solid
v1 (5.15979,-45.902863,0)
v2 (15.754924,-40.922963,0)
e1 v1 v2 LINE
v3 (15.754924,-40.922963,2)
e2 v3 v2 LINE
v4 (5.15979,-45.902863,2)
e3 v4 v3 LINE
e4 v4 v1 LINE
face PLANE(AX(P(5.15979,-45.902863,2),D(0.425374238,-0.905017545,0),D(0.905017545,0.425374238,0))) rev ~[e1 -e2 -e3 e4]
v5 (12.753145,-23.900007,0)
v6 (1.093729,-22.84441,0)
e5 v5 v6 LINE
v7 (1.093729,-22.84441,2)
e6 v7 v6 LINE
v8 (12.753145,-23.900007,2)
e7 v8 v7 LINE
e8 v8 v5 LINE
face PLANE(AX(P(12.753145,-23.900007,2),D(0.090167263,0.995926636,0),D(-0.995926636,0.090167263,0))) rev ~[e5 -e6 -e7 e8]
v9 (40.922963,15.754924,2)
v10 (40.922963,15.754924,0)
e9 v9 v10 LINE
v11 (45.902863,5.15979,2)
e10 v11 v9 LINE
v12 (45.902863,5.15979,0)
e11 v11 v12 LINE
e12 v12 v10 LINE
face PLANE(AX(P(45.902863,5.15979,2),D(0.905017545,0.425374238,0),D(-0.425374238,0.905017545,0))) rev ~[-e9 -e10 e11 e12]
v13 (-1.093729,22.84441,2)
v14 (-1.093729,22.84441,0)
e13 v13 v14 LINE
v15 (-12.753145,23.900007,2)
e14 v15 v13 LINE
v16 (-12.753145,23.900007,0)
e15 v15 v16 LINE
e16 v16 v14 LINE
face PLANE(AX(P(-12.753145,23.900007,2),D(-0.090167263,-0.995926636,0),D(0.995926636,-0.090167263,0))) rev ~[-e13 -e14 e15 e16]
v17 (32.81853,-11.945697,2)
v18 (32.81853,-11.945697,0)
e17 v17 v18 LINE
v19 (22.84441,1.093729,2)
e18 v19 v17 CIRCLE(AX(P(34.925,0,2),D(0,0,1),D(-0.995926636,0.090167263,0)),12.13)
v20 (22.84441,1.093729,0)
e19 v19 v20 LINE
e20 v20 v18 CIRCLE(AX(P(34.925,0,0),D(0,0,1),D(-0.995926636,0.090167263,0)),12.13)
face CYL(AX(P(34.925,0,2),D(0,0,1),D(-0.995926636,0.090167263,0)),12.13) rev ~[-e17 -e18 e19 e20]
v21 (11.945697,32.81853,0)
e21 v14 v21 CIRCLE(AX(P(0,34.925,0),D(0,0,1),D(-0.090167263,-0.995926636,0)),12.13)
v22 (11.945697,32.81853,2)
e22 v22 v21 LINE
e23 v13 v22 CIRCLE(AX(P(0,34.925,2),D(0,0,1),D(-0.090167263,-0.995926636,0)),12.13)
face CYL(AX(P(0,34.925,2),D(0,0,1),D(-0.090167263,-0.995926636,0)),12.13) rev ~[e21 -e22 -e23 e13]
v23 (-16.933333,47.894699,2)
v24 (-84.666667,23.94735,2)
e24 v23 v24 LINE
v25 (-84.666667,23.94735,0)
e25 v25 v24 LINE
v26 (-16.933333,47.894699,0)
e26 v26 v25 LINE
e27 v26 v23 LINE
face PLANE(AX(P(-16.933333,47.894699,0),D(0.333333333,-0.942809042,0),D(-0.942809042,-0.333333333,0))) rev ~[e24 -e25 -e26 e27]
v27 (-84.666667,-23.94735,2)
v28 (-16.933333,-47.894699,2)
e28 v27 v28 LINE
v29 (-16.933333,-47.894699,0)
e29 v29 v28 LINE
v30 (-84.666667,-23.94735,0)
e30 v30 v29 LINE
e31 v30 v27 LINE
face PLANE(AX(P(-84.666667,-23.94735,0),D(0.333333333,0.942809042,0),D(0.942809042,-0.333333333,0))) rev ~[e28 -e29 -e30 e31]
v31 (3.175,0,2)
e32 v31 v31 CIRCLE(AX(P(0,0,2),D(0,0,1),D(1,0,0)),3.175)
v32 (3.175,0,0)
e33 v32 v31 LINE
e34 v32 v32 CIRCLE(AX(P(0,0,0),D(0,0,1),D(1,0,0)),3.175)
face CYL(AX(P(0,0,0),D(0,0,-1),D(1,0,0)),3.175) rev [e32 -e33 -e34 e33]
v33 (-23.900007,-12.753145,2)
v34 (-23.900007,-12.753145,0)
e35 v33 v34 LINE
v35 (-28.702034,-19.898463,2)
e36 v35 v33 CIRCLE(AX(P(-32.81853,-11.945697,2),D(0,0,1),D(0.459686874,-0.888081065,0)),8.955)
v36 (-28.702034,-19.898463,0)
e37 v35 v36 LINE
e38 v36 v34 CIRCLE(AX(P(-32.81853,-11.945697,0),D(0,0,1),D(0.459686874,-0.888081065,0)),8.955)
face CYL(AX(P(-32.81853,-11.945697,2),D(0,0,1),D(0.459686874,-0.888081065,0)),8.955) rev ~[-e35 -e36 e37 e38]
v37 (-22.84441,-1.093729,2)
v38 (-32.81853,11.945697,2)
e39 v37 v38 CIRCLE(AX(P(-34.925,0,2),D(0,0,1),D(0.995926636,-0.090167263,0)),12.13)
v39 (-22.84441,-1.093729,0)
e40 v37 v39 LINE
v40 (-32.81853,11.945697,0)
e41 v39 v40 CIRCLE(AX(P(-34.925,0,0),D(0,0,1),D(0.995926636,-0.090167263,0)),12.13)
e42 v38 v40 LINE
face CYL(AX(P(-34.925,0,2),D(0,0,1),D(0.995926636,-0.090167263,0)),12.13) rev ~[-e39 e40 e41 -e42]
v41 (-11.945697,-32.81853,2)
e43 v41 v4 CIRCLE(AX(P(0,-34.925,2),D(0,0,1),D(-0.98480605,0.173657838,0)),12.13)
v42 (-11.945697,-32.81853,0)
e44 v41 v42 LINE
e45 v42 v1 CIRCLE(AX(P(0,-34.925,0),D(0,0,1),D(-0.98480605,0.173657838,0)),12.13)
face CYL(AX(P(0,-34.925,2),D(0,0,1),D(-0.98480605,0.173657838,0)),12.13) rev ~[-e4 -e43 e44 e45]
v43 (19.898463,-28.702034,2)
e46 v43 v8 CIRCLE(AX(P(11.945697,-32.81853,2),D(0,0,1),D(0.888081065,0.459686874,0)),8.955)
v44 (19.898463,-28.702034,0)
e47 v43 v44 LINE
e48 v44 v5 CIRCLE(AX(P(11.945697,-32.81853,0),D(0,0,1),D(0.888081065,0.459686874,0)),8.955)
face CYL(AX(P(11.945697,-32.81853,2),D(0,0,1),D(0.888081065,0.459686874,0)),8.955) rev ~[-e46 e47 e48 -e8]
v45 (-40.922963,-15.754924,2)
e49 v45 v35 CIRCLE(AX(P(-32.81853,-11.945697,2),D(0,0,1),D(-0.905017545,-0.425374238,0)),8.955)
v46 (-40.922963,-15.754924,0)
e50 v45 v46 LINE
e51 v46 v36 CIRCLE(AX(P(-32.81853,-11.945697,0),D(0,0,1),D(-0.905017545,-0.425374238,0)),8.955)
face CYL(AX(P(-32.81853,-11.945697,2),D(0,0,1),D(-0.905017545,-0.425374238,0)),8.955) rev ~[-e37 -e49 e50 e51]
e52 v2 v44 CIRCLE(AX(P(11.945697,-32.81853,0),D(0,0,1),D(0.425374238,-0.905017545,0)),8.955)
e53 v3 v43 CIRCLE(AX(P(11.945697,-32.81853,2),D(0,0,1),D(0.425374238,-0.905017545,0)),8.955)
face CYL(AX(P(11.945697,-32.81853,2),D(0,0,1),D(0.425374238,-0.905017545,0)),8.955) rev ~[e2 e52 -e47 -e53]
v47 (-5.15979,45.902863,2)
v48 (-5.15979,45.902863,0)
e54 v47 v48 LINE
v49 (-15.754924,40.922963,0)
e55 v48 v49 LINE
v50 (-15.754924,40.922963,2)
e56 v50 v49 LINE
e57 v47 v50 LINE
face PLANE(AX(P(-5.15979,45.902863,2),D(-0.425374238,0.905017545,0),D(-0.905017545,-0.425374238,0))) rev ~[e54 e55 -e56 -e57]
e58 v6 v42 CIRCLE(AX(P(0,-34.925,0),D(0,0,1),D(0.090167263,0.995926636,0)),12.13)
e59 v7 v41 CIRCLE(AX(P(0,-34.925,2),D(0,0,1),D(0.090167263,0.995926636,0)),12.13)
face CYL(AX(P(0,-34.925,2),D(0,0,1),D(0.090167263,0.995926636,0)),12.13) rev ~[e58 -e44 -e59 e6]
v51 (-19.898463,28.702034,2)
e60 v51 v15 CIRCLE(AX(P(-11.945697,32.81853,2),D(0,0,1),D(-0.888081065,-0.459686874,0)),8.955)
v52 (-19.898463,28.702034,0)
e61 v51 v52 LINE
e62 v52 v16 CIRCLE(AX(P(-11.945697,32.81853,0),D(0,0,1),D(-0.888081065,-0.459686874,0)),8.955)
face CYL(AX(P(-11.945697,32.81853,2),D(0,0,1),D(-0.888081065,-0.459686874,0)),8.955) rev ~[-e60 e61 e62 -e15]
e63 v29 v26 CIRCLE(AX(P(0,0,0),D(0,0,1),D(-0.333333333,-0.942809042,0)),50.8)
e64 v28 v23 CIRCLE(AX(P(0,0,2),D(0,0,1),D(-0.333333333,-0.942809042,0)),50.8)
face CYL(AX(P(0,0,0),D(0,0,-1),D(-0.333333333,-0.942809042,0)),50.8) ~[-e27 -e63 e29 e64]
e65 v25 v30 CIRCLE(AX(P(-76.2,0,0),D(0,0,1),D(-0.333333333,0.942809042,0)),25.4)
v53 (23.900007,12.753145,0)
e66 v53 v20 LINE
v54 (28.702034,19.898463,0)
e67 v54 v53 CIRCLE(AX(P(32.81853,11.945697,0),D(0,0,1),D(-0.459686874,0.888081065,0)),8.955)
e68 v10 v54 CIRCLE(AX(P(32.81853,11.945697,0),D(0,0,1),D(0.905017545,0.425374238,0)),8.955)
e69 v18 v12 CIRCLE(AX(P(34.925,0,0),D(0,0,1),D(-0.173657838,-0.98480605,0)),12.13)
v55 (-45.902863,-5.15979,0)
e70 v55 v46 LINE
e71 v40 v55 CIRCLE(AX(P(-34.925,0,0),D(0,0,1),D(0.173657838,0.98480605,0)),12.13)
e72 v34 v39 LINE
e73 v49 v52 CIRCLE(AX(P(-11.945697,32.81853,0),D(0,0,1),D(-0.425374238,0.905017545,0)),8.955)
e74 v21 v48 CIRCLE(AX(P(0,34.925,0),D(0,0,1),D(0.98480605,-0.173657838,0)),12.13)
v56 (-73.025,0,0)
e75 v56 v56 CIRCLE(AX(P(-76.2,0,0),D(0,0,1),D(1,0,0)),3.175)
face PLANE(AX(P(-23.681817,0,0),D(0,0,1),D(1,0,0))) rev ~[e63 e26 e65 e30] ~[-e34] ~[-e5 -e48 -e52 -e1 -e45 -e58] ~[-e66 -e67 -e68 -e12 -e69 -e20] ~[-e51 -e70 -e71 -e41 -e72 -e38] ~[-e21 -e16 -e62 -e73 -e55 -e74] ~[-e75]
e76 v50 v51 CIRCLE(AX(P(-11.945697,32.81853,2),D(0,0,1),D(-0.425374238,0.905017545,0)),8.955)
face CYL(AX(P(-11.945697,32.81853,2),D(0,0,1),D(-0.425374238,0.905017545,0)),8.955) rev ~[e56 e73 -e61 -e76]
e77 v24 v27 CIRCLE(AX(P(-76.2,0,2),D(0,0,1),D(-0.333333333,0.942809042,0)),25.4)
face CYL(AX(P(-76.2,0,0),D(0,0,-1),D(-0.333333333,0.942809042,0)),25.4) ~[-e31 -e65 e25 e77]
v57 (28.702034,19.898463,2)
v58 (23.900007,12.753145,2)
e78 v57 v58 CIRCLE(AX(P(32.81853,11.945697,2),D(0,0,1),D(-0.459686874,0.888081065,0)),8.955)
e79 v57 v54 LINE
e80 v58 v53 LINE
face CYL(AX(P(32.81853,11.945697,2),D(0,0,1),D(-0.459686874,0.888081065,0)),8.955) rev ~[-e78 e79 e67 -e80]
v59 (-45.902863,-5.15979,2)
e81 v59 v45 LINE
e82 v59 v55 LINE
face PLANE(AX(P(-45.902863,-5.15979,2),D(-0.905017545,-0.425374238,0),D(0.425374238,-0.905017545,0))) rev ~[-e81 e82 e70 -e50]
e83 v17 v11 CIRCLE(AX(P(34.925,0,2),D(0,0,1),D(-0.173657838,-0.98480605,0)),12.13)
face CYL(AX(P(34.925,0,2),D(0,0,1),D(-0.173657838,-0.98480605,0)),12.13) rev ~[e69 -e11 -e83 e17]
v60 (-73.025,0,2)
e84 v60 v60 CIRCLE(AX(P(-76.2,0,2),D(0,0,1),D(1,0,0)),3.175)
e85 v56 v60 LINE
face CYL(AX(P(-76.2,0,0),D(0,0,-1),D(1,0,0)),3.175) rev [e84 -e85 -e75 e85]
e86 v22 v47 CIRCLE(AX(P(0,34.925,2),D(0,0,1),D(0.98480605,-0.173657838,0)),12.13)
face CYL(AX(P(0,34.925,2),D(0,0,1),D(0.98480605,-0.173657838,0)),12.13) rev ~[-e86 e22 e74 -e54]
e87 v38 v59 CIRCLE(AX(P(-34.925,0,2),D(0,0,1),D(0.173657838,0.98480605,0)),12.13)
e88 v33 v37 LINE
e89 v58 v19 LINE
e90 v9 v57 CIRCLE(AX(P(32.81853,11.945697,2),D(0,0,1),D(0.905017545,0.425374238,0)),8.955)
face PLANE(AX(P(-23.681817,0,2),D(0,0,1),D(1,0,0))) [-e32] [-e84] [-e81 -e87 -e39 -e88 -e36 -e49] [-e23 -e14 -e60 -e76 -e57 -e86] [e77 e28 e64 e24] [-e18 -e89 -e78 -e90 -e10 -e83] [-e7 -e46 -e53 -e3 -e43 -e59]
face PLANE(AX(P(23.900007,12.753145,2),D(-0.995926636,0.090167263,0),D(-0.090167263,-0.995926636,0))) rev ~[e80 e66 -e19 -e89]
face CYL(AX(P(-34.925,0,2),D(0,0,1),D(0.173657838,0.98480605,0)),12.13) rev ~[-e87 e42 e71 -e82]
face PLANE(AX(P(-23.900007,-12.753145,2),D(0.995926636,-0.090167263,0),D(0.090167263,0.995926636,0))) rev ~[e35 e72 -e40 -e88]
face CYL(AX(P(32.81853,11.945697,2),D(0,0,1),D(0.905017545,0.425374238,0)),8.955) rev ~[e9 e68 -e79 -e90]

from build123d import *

# Parameters (mm, degrees)
F0_R            = 3.175
F1_DEPTH        = 2
F3_DEPTH        = 2.001
F3_COPIES_COUNT = 4


# Not quite as in the source:
# - a pattern or mirror of a feature is missing from the dataset's text; its kind, count and spacing are read off the source's solid


with BuildPart() as f1:
    # F0 (on Top) → F1 (new body)
    with BuildSketch(Plane.XY):
        with BuildLine():
            Line((-84.6666666667, -23.9473496562), (-16.9333333333, -47.8946993124))
            ThreePointArc((-16.9333333333, -47.8946993124), (50.8, 0), (-16.9333333333, 47.8946993124))
            Line((-16.9333333333, 47.8946993124), (-84.6666666667, 23.9473496562))
            ThreePointArc((-84.6666666667, 23.9473496562), (-101.6, 0), (-84.6666666667, -23.9473496562))
        make_face()
        with Locations((-76.2, 0)):
            Circle(F0_R, mode=Mode.SUBTRACT)
        Circle(F0_R, mode=Mode.SUBTRACT)
    extrude(amount=F1_DEPTH)

    # F2 (on face) → F3 (cut, through all)
    with BuildSketch(Plane.XY.offset(2)):
        with BuildLine():
            ThreePointArc((-28.7020344674, -19.8984633183), (-34.6367957344, -4.4775), (-32.8185304223, 11.945697381))
            ThreePointArc((-32.8185304223, 11.945697381), (-44.5595640794, 7.3696726522), (-45.9028628242, -5.1597895126))
            Line((-45.9028628242, -5.1597895126), (-40.9229625402, -15.7549236864))
            ThreePointArc((-40.9229625402, -15.7549236864), (-35.6939675857, -20.4264925159), (-28.7020344674, -19.8984633183))
        make_face()
        with BuildLine():
            ThreePointArc((-22.8444099031, -1.093728902), (-25.2904359206, 7.3696726522), (-32.8185304223, 11.945697381))
            ThreePointArc((-32.8185304223, 11.945697381), (-34.6367957344, -4.4775), (-28.7020344674, -19.8984633183))
            ThreePointArc((-28.7020344674, -19.8984633183), (-25.386046138, -16.940715135), (-23.9000073953, -12.7531452225))
            Line((-23.9000073953, -12.7531452225), (-22.8444099031, -1.093728902))
        make_face()
    f3 = extrude(amount=-F3_DEPTH, mode=Mode.SUBTRACT)

    # F3_copies: F3 ×4 about axis
    f3_copies_axis = Axis((0, 0, 0), (0, 0, 1))
    for i in range(1, F3_COPIES_COUNT):
        add(f3.rotate(f3_copies_axis, i * 360 / F3_COPIES_COUNT), mode=Mode.SUBTRACT)


solid = f1.part
